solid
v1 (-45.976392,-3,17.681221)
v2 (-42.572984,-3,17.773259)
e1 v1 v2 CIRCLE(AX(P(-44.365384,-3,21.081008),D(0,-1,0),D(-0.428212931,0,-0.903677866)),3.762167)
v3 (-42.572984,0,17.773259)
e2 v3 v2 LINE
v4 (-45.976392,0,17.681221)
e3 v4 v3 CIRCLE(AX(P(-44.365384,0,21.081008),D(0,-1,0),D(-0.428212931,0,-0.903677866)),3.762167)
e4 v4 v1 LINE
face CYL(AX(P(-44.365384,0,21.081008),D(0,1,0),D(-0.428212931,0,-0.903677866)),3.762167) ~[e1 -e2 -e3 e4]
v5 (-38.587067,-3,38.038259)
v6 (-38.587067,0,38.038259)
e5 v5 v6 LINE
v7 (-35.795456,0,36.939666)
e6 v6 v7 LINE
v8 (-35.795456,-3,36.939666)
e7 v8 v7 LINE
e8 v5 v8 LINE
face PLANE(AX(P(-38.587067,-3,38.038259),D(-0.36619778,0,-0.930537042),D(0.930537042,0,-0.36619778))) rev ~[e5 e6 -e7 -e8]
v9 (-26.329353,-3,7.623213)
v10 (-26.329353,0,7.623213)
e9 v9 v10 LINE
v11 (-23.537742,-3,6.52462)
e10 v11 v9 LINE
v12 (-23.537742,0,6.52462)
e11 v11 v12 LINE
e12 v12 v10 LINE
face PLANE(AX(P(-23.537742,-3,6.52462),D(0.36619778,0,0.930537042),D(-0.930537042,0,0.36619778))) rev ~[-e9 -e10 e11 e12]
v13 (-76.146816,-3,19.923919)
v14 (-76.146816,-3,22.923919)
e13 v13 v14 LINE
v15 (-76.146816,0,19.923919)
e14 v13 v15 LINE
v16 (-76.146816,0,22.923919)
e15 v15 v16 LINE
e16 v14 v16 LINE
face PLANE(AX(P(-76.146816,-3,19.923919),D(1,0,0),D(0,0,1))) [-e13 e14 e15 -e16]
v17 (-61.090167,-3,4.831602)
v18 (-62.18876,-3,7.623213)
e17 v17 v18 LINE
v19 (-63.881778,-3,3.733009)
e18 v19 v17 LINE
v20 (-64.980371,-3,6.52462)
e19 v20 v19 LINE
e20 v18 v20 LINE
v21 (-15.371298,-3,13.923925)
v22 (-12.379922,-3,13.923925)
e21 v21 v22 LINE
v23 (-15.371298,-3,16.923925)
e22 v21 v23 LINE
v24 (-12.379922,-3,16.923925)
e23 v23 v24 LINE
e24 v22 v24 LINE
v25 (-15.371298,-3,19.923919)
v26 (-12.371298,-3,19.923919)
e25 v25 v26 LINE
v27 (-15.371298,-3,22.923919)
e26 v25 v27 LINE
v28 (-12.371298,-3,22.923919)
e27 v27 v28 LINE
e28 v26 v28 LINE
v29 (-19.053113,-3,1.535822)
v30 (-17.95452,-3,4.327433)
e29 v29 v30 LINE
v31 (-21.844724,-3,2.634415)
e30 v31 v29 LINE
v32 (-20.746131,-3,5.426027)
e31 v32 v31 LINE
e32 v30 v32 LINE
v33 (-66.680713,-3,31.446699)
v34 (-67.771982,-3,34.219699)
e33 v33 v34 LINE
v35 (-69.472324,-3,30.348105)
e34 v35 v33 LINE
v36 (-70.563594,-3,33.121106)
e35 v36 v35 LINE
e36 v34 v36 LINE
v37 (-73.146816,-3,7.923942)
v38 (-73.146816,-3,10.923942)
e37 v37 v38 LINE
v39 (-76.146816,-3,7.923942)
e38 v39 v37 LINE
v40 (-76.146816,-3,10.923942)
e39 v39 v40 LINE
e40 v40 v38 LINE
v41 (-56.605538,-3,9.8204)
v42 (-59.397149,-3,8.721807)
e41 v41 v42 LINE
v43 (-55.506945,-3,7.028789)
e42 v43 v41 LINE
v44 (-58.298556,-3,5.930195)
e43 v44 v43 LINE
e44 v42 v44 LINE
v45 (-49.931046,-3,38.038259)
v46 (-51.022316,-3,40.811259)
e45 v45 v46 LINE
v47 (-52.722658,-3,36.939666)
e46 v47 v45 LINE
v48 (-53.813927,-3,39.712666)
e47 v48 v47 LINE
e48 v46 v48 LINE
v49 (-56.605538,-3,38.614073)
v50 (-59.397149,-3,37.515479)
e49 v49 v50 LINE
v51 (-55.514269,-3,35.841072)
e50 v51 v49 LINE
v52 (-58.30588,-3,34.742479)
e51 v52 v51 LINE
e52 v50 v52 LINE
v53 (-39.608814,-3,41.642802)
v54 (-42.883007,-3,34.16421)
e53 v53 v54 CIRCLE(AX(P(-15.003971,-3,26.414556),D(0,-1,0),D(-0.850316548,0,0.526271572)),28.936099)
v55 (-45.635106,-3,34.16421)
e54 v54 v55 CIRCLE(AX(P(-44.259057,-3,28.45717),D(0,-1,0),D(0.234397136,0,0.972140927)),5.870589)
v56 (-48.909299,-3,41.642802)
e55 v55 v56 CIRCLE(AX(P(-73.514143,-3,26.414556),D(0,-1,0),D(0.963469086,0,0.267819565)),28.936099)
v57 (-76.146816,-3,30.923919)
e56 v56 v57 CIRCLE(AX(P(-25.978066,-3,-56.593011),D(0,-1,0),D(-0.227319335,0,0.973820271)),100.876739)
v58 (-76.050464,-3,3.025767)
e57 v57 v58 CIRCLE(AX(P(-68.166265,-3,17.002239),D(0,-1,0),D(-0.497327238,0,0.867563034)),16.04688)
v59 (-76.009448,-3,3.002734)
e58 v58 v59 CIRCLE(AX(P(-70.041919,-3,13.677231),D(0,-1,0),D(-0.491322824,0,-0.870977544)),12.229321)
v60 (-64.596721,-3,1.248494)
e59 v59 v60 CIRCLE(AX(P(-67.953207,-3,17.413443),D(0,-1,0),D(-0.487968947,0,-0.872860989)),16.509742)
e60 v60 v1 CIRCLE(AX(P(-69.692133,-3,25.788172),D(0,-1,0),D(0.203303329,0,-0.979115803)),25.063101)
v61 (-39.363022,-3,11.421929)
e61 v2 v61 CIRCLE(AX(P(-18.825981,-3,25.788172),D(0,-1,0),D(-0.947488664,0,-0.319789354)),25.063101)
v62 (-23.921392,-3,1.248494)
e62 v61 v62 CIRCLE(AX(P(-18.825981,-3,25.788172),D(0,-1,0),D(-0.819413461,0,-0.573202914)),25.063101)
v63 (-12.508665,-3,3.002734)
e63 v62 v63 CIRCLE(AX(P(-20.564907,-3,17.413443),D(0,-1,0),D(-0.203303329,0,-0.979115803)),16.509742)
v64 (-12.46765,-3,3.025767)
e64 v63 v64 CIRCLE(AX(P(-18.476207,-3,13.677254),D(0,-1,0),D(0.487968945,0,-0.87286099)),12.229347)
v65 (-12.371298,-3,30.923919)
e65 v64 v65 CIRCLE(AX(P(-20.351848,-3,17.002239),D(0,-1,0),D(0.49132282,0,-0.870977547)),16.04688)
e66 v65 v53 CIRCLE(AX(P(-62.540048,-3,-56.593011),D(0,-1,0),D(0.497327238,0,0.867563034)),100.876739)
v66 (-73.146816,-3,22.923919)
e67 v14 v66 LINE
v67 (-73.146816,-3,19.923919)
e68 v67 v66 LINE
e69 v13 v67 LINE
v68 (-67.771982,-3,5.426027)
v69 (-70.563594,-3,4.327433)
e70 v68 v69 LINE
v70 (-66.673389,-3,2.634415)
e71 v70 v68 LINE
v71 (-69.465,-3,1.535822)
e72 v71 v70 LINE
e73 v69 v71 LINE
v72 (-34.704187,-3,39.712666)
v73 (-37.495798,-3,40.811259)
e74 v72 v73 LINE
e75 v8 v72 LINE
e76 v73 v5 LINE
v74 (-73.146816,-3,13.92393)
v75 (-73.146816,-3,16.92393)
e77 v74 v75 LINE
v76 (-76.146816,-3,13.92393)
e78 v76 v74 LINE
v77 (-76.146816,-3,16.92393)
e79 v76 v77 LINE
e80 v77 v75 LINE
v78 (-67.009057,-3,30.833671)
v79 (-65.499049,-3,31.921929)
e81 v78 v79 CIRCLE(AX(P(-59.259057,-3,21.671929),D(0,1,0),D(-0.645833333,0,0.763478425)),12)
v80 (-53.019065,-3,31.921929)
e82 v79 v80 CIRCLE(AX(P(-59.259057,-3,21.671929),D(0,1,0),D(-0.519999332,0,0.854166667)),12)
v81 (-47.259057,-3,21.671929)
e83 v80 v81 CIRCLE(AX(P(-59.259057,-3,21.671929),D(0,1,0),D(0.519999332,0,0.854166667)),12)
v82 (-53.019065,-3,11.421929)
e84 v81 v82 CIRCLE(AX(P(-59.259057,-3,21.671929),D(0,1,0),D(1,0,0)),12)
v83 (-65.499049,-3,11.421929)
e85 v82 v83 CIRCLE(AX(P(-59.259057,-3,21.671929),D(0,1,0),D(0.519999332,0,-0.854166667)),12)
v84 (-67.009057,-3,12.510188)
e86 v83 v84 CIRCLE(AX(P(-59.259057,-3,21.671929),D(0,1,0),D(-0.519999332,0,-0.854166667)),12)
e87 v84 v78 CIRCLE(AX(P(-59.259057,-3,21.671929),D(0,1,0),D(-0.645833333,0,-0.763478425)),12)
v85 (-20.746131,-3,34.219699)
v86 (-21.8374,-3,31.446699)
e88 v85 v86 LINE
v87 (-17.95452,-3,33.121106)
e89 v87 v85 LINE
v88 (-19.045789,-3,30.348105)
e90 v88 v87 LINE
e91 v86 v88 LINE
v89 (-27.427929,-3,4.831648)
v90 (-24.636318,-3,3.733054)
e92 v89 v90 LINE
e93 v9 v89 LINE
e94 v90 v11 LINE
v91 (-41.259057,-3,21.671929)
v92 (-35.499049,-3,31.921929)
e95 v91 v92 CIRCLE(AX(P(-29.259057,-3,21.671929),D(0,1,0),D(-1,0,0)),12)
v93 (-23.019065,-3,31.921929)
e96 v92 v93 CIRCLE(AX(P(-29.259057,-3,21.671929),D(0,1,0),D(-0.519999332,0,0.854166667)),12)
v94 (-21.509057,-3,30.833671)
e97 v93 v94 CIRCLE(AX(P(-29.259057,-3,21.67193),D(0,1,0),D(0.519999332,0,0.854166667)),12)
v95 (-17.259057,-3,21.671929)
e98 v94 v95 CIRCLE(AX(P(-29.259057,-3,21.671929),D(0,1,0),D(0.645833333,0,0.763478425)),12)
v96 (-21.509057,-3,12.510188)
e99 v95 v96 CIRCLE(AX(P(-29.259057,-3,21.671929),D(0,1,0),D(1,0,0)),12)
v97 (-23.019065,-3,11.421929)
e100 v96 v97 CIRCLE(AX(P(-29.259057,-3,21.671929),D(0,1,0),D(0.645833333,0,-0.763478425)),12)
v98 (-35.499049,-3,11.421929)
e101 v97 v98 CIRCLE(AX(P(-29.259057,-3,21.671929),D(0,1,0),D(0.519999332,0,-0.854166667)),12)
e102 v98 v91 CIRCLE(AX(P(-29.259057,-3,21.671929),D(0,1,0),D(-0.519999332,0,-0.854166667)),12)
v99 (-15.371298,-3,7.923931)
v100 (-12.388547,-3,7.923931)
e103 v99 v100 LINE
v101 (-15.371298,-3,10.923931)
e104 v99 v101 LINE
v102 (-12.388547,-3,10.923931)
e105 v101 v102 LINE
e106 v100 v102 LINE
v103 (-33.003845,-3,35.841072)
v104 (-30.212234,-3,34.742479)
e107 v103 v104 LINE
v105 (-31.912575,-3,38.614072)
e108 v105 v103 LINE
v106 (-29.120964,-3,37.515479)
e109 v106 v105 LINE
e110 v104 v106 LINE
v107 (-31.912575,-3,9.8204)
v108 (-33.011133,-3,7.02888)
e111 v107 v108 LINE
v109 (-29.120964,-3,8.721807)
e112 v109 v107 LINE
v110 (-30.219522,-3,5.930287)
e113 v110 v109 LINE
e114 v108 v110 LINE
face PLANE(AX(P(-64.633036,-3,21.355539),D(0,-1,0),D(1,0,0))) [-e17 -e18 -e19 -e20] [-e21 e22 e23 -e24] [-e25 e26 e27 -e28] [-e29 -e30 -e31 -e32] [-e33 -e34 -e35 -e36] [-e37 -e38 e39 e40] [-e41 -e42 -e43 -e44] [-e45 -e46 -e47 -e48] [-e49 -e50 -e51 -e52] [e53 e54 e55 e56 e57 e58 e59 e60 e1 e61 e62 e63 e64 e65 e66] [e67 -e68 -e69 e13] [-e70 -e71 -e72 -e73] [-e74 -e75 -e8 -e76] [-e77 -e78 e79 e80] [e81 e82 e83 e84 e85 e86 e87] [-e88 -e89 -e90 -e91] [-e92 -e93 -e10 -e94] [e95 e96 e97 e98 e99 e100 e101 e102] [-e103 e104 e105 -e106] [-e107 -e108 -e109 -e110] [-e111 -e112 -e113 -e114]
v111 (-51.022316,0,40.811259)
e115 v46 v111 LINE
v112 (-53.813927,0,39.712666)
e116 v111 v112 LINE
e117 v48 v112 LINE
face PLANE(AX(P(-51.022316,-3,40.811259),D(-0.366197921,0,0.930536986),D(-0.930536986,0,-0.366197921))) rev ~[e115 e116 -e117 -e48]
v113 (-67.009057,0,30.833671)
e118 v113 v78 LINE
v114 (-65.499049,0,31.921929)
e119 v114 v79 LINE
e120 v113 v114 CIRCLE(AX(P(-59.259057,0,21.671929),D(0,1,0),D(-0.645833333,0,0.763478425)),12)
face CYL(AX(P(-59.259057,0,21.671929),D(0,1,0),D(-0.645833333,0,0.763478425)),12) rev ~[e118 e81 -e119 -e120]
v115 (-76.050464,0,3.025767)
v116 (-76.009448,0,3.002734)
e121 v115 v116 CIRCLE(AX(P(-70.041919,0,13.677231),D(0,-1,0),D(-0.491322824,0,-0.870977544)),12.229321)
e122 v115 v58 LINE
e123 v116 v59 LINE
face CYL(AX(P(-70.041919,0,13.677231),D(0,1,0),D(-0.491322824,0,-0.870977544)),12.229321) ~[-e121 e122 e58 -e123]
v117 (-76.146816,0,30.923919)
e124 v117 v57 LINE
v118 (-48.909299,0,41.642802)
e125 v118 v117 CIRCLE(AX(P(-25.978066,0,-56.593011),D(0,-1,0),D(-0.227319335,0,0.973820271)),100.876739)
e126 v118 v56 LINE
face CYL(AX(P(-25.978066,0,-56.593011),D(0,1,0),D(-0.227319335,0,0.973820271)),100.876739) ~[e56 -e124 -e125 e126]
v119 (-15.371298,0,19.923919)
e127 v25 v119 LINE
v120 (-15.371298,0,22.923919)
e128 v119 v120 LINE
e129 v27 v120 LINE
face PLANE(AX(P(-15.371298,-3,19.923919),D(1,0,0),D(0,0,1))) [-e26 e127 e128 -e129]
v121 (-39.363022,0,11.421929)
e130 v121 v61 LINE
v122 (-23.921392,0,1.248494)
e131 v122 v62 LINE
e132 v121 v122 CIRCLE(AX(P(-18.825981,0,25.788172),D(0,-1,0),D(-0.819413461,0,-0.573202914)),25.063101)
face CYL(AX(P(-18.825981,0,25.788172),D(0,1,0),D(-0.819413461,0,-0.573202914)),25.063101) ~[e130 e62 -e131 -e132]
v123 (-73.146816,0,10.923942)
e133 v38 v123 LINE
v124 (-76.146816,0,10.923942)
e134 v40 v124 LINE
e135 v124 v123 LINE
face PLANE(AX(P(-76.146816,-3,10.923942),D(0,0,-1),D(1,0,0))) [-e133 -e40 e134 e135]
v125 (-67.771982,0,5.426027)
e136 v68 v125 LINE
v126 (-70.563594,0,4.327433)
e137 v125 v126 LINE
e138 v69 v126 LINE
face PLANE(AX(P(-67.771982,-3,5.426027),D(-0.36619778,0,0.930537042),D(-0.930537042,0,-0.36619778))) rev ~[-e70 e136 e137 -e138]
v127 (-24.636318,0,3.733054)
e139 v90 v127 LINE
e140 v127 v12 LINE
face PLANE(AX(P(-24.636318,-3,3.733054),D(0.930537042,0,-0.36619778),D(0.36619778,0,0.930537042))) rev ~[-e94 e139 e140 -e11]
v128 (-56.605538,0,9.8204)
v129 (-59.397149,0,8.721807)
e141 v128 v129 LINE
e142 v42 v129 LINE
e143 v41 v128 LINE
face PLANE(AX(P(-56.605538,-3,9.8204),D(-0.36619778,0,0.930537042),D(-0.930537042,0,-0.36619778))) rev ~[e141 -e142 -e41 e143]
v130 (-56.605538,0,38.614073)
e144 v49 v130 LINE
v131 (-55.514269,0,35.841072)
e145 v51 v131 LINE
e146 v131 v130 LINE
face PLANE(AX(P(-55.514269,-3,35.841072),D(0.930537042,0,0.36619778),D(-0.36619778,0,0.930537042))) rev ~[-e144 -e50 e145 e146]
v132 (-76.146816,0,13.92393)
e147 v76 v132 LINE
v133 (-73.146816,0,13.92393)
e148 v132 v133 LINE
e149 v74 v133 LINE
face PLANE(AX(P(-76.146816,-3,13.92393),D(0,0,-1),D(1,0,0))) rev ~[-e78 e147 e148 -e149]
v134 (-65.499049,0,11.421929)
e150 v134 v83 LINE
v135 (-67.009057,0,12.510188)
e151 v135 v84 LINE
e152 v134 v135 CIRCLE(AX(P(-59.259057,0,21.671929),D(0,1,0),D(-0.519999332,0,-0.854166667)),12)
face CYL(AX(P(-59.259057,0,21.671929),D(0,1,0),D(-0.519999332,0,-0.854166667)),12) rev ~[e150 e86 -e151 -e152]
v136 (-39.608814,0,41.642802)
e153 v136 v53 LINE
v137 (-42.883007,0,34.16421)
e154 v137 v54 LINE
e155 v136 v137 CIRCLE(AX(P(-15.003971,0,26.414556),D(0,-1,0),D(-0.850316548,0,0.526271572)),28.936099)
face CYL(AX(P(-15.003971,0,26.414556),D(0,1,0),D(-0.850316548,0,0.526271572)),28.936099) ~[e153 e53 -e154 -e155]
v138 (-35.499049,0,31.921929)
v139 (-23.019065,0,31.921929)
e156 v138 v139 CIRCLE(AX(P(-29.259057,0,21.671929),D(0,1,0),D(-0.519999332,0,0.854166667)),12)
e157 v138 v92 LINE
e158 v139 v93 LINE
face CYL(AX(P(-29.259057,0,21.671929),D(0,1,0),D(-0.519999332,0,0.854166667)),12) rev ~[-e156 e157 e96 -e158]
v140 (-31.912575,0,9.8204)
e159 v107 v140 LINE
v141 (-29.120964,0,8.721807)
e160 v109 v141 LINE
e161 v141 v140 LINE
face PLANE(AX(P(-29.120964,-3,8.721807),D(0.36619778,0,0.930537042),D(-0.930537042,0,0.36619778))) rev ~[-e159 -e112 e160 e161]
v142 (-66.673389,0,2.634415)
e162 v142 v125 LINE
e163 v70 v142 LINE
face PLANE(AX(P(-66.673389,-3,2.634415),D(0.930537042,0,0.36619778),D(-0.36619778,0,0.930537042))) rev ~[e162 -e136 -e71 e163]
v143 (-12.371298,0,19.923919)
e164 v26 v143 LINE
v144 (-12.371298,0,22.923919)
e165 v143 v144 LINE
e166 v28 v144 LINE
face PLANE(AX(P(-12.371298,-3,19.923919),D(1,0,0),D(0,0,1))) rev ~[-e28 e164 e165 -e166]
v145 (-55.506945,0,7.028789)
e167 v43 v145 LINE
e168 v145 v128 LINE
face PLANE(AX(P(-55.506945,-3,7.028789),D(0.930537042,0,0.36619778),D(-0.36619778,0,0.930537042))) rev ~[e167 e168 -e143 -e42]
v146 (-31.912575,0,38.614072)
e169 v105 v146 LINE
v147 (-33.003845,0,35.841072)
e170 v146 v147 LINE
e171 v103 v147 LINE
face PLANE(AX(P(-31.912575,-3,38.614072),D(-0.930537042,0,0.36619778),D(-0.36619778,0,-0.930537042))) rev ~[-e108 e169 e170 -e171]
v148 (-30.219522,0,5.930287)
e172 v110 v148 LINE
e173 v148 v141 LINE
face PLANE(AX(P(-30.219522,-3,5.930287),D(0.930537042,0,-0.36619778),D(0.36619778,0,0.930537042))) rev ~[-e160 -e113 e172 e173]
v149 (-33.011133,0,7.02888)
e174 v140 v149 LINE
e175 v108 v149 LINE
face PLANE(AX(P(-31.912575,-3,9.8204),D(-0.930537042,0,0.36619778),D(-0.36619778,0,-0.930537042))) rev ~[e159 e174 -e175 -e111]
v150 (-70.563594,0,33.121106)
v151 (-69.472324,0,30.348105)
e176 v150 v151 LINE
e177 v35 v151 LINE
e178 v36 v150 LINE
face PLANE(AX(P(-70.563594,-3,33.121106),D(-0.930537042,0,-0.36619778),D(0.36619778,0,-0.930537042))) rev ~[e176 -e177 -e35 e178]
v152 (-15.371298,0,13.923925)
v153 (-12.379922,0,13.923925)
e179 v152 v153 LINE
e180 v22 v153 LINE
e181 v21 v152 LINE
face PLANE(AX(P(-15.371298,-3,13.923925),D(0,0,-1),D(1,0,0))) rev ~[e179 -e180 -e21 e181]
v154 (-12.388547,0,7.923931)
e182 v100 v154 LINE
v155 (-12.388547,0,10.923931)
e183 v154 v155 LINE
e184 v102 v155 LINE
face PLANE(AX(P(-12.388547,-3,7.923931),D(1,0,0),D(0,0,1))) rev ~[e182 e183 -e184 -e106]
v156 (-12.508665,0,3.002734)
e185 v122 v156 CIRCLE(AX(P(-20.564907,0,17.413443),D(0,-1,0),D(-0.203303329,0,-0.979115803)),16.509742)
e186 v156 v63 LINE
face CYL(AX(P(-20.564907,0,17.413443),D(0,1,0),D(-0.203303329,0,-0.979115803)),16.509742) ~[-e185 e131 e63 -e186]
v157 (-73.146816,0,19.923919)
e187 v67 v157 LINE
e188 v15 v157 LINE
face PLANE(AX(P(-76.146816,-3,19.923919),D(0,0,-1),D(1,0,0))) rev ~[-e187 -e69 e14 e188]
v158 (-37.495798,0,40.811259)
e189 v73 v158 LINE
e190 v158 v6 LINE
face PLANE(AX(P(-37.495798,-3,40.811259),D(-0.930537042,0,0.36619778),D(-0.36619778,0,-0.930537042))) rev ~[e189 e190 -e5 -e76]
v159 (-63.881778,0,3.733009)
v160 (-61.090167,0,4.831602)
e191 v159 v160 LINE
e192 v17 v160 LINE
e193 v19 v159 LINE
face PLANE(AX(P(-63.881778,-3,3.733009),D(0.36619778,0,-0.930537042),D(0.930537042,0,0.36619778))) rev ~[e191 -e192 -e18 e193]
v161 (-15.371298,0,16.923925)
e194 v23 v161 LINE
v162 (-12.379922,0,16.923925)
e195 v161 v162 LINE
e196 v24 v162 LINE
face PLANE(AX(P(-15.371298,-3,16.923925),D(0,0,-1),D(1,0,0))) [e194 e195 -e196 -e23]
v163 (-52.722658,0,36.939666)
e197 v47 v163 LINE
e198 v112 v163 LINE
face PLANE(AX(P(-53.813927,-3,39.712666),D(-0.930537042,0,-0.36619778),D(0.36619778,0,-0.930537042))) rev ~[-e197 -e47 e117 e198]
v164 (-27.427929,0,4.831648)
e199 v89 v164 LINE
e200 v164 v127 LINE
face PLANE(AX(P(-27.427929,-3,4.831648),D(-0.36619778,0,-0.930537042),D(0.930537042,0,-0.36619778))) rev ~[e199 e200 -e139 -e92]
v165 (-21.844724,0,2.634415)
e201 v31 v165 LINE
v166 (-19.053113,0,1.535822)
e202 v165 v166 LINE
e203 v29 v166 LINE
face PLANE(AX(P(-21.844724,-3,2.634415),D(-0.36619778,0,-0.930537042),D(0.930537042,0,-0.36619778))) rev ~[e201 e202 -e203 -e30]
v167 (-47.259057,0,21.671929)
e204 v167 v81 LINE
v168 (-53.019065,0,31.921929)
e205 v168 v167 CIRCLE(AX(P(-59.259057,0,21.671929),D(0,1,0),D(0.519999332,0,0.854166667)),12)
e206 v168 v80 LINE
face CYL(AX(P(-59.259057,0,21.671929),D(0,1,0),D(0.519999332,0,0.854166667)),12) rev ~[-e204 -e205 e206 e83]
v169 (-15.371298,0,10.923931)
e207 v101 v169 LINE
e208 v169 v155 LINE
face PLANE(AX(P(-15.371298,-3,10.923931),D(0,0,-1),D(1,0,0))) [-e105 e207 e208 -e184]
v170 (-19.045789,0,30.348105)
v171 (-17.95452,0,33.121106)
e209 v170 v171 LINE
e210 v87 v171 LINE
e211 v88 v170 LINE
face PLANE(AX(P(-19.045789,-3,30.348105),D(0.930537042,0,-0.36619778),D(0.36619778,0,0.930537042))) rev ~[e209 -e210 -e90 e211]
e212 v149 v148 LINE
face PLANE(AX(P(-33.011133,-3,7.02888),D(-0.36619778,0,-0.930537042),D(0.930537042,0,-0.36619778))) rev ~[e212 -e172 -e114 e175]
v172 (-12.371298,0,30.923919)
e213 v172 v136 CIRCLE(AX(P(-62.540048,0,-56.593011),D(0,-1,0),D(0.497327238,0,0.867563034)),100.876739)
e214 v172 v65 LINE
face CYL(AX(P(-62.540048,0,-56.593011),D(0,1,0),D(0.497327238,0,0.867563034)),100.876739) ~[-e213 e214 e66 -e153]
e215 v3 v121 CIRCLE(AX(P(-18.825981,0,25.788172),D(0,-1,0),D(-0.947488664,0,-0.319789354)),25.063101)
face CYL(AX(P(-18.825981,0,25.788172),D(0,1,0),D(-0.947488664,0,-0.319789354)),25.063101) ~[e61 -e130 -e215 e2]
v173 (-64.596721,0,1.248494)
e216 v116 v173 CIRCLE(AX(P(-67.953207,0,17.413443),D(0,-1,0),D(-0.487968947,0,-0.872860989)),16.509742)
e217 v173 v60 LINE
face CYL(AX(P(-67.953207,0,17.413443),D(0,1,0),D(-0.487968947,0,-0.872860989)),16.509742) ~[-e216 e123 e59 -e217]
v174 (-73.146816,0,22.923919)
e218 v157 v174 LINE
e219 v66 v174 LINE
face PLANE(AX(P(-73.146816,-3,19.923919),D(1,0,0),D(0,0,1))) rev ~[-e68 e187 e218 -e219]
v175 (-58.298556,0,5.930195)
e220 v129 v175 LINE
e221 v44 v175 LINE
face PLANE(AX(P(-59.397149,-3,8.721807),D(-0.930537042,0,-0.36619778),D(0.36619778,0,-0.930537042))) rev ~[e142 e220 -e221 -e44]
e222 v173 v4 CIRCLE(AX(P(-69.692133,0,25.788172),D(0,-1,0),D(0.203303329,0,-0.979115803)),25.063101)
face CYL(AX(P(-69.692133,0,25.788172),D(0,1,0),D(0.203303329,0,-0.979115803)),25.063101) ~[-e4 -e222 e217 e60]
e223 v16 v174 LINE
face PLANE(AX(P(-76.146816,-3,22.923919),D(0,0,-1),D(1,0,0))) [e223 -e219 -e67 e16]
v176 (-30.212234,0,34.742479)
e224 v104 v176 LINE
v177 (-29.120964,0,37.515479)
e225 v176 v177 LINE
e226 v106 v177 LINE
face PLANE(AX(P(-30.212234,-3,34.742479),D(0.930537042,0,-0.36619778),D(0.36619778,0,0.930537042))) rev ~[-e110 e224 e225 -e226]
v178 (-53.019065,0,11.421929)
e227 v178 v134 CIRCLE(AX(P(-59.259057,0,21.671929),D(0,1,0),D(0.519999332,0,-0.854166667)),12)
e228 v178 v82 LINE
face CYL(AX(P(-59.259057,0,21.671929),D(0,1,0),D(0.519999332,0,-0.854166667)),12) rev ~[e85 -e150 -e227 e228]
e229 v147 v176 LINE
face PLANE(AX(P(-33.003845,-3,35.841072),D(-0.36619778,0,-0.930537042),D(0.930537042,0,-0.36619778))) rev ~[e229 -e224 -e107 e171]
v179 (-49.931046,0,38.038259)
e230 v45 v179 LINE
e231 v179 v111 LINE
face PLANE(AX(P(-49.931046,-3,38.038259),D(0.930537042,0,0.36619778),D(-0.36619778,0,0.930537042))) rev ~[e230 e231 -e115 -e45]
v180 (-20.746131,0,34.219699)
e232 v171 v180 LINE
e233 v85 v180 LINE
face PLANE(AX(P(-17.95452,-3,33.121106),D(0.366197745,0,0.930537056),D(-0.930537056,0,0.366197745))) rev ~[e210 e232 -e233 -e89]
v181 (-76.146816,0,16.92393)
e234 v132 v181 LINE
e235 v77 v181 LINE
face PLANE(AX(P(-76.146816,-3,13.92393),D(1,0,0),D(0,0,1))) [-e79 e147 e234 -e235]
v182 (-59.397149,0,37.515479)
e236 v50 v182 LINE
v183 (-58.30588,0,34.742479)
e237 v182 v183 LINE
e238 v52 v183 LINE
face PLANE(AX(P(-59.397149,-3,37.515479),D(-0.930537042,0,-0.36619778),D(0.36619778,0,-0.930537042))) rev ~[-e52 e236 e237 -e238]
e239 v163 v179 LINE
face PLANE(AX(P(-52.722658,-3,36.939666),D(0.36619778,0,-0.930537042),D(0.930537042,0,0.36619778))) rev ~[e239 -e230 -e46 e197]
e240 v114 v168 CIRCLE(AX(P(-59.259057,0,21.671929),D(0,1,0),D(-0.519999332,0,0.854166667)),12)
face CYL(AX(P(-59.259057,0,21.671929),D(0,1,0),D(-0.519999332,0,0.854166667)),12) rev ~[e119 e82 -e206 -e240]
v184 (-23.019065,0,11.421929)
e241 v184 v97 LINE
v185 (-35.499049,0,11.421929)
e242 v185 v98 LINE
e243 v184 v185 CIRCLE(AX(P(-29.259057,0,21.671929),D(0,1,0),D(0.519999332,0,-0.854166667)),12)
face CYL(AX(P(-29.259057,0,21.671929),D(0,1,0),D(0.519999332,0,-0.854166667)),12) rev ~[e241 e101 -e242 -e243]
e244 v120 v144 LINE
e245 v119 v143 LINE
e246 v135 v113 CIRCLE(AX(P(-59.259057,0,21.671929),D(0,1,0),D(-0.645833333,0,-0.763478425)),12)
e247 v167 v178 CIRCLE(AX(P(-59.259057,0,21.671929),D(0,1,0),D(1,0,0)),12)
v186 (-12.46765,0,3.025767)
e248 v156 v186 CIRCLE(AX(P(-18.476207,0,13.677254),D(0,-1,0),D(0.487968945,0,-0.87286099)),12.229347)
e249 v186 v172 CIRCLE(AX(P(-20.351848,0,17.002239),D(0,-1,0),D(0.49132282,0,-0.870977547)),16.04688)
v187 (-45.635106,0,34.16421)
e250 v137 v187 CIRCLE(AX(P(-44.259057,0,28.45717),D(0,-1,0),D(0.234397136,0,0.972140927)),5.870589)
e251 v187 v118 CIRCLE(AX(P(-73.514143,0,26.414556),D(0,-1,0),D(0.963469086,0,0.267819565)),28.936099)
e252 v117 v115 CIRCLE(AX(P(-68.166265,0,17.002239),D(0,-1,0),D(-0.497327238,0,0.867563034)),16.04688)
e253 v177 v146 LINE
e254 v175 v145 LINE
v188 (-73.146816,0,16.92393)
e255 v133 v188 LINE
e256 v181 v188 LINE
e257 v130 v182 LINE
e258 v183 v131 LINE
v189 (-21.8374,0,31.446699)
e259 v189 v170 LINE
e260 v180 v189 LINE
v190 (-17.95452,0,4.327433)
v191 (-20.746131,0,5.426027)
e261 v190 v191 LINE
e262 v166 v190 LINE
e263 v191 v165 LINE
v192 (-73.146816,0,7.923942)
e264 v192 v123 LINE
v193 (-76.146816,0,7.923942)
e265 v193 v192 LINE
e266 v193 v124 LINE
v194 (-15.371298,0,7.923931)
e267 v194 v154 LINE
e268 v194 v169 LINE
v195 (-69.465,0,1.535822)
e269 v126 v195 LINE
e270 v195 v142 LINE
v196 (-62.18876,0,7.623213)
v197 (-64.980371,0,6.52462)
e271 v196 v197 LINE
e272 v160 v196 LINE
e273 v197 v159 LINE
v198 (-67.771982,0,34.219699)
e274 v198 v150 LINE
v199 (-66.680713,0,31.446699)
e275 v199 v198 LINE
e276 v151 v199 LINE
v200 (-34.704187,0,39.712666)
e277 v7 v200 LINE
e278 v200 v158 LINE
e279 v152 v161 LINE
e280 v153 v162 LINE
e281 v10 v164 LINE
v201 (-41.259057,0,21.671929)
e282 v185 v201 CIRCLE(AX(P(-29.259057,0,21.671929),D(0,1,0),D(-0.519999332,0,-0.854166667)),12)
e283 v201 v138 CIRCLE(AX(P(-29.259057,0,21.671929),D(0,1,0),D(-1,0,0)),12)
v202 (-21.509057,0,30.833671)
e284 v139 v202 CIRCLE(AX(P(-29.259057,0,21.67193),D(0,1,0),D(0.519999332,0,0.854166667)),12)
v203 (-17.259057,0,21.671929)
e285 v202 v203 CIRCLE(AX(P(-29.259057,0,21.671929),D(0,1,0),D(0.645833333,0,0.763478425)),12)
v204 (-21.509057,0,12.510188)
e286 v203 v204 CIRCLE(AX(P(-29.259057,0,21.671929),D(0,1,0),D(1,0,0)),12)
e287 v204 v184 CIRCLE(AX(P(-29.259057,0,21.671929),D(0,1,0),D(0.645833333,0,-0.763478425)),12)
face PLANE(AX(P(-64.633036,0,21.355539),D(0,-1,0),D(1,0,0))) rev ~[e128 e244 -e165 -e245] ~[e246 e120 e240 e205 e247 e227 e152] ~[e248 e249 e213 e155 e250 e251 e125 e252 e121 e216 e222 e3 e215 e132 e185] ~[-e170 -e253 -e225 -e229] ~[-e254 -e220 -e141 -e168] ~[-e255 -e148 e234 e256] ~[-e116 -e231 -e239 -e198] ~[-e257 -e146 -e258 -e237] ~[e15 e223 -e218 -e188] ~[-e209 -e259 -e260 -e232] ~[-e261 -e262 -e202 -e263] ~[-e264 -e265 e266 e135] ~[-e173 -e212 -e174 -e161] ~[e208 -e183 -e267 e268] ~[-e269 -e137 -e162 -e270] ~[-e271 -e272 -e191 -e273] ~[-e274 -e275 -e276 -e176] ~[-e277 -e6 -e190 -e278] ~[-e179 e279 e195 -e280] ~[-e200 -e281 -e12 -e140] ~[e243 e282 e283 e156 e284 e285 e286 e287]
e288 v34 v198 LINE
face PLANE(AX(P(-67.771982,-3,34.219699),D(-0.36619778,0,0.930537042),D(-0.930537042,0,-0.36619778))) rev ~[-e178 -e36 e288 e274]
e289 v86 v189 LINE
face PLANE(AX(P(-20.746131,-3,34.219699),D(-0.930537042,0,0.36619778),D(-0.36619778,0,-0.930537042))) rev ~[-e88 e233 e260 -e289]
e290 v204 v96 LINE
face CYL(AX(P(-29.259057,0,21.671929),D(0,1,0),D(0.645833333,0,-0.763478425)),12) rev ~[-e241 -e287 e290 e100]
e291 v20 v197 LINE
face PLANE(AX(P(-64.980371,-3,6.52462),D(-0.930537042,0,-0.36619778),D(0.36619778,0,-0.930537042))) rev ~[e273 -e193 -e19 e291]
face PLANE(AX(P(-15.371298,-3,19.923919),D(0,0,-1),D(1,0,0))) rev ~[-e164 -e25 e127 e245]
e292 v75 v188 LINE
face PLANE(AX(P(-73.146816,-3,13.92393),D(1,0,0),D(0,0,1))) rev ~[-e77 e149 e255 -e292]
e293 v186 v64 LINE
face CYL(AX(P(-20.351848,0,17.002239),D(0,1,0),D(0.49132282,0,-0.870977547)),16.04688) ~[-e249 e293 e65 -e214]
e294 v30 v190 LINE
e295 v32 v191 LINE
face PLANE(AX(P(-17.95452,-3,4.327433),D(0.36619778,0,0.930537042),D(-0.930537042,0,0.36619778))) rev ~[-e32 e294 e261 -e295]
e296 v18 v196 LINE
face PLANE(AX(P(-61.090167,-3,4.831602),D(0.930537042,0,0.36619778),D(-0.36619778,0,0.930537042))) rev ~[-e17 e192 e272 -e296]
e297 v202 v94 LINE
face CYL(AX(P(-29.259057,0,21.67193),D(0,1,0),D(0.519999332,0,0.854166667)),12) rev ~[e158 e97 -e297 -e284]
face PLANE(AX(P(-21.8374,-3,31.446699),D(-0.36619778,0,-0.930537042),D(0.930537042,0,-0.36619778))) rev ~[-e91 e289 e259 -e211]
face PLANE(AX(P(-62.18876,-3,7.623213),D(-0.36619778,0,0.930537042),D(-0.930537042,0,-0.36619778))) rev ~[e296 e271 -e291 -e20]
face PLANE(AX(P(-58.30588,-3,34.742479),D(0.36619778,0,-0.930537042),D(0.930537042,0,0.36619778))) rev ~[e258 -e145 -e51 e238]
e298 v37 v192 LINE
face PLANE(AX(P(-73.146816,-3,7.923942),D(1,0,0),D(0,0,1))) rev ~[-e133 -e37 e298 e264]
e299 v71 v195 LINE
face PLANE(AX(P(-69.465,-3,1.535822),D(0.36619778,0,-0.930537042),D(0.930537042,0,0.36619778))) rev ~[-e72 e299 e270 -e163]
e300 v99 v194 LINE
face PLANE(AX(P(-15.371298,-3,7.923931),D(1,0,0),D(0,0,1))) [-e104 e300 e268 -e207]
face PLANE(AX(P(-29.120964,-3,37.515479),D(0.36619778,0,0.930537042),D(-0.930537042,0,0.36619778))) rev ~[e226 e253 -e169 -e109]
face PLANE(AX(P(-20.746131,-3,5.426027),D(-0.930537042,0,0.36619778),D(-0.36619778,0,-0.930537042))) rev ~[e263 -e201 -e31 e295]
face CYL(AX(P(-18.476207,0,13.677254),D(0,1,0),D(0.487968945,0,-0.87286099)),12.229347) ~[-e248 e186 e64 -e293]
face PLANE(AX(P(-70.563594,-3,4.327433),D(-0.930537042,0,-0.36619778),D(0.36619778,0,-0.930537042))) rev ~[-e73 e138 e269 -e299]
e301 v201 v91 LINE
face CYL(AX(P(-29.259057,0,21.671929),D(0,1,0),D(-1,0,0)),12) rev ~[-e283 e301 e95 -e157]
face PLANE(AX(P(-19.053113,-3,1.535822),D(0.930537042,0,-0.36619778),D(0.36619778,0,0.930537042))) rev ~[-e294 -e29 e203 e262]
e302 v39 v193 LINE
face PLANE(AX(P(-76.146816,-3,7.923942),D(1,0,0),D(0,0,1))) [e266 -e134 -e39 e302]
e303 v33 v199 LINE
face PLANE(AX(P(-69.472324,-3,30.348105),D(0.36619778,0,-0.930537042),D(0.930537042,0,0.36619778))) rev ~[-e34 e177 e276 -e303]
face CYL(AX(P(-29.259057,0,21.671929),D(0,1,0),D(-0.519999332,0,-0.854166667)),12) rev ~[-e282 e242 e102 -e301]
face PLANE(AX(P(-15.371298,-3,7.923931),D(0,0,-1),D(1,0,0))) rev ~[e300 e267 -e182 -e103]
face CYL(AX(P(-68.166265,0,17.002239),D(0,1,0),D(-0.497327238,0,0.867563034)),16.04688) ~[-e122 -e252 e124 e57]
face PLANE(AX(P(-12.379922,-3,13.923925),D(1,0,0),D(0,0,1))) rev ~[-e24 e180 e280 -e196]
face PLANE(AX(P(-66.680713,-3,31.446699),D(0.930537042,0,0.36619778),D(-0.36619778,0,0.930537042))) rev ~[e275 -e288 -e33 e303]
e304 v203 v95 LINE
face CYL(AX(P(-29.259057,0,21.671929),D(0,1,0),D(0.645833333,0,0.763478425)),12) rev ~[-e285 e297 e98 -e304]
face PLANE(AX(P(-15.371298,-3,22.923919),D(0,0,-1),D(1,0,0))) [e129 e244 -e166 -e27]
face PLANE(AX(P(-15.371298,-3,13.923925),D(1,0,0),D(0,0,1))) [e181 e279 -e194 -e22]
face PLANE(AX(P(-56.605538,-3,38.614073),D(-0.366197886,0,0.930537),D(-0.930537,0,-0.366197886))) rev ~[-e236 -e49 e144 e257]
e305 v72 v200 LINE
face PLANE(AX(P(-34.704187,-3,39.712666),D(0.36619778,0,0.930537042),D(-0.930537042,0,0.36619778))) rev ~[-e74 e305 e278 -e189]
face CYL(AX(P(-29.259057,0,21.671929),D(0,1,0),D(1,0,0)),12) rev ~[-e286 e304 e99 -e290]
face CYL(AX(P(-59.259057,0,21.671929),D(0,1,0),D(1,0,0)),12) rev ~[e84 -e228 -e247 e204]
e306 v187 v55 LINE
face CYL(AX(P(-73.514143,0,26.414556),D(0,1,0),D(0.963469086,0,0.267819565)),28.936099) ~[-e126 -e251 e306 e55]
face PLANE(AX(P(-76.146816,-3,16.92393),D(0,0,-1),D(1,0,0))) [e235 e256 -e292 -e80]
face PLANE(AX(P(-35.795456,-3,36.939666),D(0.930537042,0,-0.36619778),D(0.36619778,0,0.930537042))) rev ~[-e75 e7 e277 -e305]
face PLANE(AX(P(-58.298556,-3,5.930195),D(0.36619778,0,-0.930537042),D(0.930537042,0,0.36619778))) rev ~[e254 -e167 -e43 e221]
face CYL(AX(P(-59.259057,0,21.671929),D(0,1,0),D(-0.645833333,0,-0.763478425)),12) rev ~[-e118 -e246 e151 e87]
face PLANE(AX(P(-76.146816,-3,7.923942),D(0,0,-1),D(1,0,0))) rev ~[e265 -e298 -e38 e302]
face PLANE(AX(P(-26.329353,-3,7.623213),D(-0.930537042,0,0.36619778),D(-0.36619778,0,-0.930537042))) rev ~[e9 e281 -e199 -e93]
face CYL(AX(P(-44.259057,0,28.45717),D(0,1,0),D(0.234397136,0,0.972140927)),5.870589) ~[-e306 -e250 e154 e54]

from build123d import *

# Parameters (mm, degrees)
F1_DEPTH = 3
F2_W     = 2.9827502628
F2_H     = 3
F2_W_2   = 2.9913751314
F2_W_3   = 3
F3_DEPTH = 25


# Not quite as in the source:
# - ends of sketch curves that miss each other by under 0.0002 mm in the source are joined


with BuildPart() as f1:
    # F0 (on Front) → F1 (new body)
    with BuildSketch(Plane.XZ):
        with BuildLine():
            ThreePointArc((-65.4990487043, 31.9219294953), (-59.2590567172, 33.6719294953), (-53.01906473, 31.9219294953))
            Line((-53.01906473, 31.9219294953), (-45.1069841329, 31.9219294953))
            ThreePointArc((-45.1069841329, 31.9219294953), (-45.3487223927, 33.0483271736), (-45.635105941, 34.1642095953))
            ThreePointArc((-45.635105941, 34.1642095953), (-47.0071291889, 38.0195574022), (-48.9092989792, 41.6428024387))
            ThreePointArc((-48.9092989792, 41.6428024387), (-62.9189036621, 37.276531414), (-76.1468158191, 30.9239188806))
            ThreePointArc((-76.1468158191, 30.9239188806), (-84.213049611, 16.9468180053), (-76.0504636415, 3.0257667966))
            ThreePointArc((-76.0504636415, 3.0257667966), (-76.029966864, 3.0142304296), (-76.0094479368, 3.0027335048))
            ThreePointArc((-76.0094479368, 3.0027335048), (-70.4614460946, 1.0953454703), (-64.596721114, 1.2484939552))
            ThreePointArc((-64.596721114, 1.2484939552), (-55.9033559949, 4.8590380101), (-49.1550909719, 11.4219294953))
            Line((-49.1550909719, 11.4219294953), (-53.01906473, 11.4219294953))
            ThreePointArc((-53.01906473, 11.4219294953), (-59.2590567172, 9.6719294953), (-65.4990487043, 11.4219294953))
            Line((-65.4990487043, 11.4219294953), (-67.0090567172, 11.4219294953))
            Line((-67.0090567172, 11.4219294953), (-67.0090567172, 12.5101883944))
            ThreePointArc((-67.0090567172, 12.5101883944), (-71.2590567172, 21.6719294953), (-67.0090567172, 30.8336705962))
            Line((-67.0090567172, 30.8336705962), (-67.0090567172, 31.9219294953))
            Line((-67.0090567172, 31.9219294953), (-65.4990487043, 31.9219294953))
        make_face()
        with BuildLine():
            ThreePointArc((-42.8830074933, 34.1642095953), (-43.1693910416, 33.0483271736), (-43.4111293014, 31.9219294953))
            Line((-43.4111293014, 31.9219294953), (-35.4990487043, 31.9219294953))
            ThreePointArc((-35.4990487043, 31.9219294953), (-29.2590567172, 33.6719294953), (-23.01906473, 31.9219294953))
            Line((-23.01906473, 31.9219294953), (-21.5090567172, 31.9219294953))
            Line((-21.5090567172, 31.9219294953), (-21.5090567172, 30.8336705962))
            ThreePointArc((-21.5090567172, 30.8336705962), (-18.3732861886, 26.7216819645), (-17.2590567172, 21.6719294953))
            ThreePointArc((-17.2590567172, 21.6719294953), (-18.3732861886, 16.6221770261), (-21.5090567172, 12.5101883944))
            Line((-21.5090567172, 12.5101883944), (-21.5090567172, 11.4219294953))
            Line((-21.5090567172, 11.4219294953), (-23.01906473, 11.4219294953))
            ThreePointArc((-23.01906473, 11.4219294953), (-29.2590567172, 9.6719294953), (-35.4990487043, 11.4219294953))
            Line((-35.4990487043, 11.4219294953), (-39.3630224624, 11.4219294953))
            ThreePointArc((-39.3630224624, 11.4219294953), (-32.6147574394, 4.8590380101), (-23.9213923203, 1.2484939552))
            ThreePointArc((-23.9213923203, 1.2484939552), (-18.0566673397, 1.0953454703), (-12.5086654975, 3.0027335048))
            ThreePointArc((-12.5086654975, 3.0027335048), (-12.4881465704, 3.0142304296), (-12.4676497928, 3.0257667966))
            ThreePointArc((-12.4676497928, 3.0257667966), (-4.3050638233, 16.9468180053), (-12.3712976152, 30.9239188806))
            ThreePointArc((-12.3712976152, 30.9239188806), (-25.5992097722, 37.276531414), (-39.6088144552, 41.6428024387))
            ThreePointArc((-39.6088144552, 41.6428024387), (-41.5109842454, 38.0195574022), (-42.8830074933, 34.1642095953))
        make_face()
        with BuildLine():
            Line((-43.5487545967, 21.6719294953), (-44.9693588376, 21.6719294953))
            ThreePointArc((-44.9693588376, 21.6719294953), (-45.3908188129, 19.6558686516), (-45.9763922185, 17.6812209304))
            ThreePointArc((-45.9763922185, 17.6812209304), (-44.2636810752, 17.3202159397), (-42.5729841678, 17.7732590184))
            ThreePointArc((-42.5729841678, 17.7732590184), (-43.1391404553, 19.7030043482), (-43.5487545967, 21.6719294953))
        make_face()
        with BuildLine():
            ThreePointArc((-43.559121813, 21.7346880473), (-43.5539581146, 21.7033054824), (-43.5487545967, 21.6719294953))
            Line((-43.5487545967, 21.6719294953), (-41.2590567172, 21.6719294953))
            ThreePointArc((-41.2590567172, 21.6719294953), (-39.7204118838, 27.550708967), (-35.4990487043, 31.9219294953))
            Line((-35.4990487043, 31.9219294953), (-43.4111293014, 31.9219294953))
            ThreePointArc((-43.4111293014, 31.9219294953), (-43.9370167563, 26.8348735037), (-43.559121813, 21.7346880473))
        make_face()
        with BuildLine():
            ThreePointArc((-53.01906473, 31.9219294953), (-48.7977015505, 27.550708967), (-47.2590567172, 21.6719294953))
            Line((-47.2590567172, 21.6719294953), (-44.9693588376, 21.6719294953))
            ThreePointArc((-44.9693588376, 21.6719294953), (-44.9641553197, 21.7033054824), (-44.9589916213, 21.7346880473))
            ThreePointArc((-44.9589916213, 21.7346880473), (-44.581096678, 26.8348735037), (-45.1069841329, 31.9219294953))
            Line((-45.1069841329, 31.9219294953), (-53.01906473, 31.9219294953))
        make_face()
        with BuildLine():
            Line((-44.9693588376, 21.6719294953), (-47.2590567172, 21.6719294953))
            ThreePointArc((-47.2590567172, 21.6719294953), (-48.7977015505, 15.7931500236), (-53.01906473, 11.4219294953))
            Line((-53.01906473, 11.4219294953), (-49.1550909719, 11.4219294953))
            ThreePointArc((-49.1550909719, 11.4219294953), (-47.3455028522, 14.4397298666), (-45.9763922185, 17.6812209304))
            ThreePointArc((-45.9763922185, 17.6812209304), (-45.3908188129, 19.6558686516), (-44.9693588376, 21.6719294953))
        make_face()
        with BuildLine():
            Line((-41.2590567172, 21.6719294953), (-43.5487545967, 21.6719294953))
            ThreePointArc((-43.5487545967, 21.6719294953), (-43.1391404553, 19.7030043482), (-42.5729841678, 17.7732590184))
            ThreePointArc((-42.5729841678, 17.7732590184), (-41.1945750254, 14.4830849229), (-39.3630224624, 11.4219294953))
            Line((-39.3630224624, 11.4219294953), (-35.4990487043, 11.4219294953))
            ThreePointArc((-35.4990487043, 11.4219294953), (-39.7204118838, 15.7931500236), (-41.2590567172, 21.6719294953))
        make_face()
        with BuildLine():
            ThreePointArc((-44.9589916213, 21.7346880473), (-44.9641553197, 21.7033054824), (-44.9693588376, 21.6719294953))
            Line((-44.9693588376, 21.6719294953), (-43.5487545967, 21.6719294953))
            ThreePointArc((-43.5487545967, 21.6719294953), (-43.5539581146, 21.7033054824), (-43.559121813, 21.7346880473))
            ThreePointArc((-43.559121813, 21.7346880473), (-43.9370167563, 26.8348735037), (-43.4111293014, 31.9219294953))
            Line((-43.4111293014, 31.9219294953), (-45.1069841329, 31.9219294953))
            ThreePointArc((-45.1069841329, 31.9219294953), (-44.581096678, 26.8348735037), (-44.9589916213, 21.7346880473))
        make_face()
        with BuildLine():
            ThreePointArc((-45.635105941, 34.1642095953), (-45.3487223927, 33.0483271736), (-45.1069841329, 31.9219294953))
            Line((-45.1069841329, 31.9219294953), (-43.4111293014, 31.9219294953))
            ThreePointArc((-43.4111293014, 31.9219294953), (-43.1693910416, 33.0483271736), (-42.8830074933, 34.1642095953))
            ThreePointArc((-42.8830074933, 34.1642095953), (-44.2590567172, 34.327758758), (-45.635105941, 34.1642095953))
        make_face()
        with BuildLine():
            Line((-67.0090567172, 11.4219294953), (-65.4990487043, 11.4219294953))
            ThreePointArc((-65.4990487043, 11.4219294953), (-66.2751842679, 11.9367379619), (-67.0090567172, 12.5101883944))
            Line((-67.0090567172, 12.5101883944), (-67.0090567172, 11.4219294953))
        make_face()
        with BuildLine():
            ThreePointArc((-21.5090567172, 12.5101883944), (-22.2429291664, 11.9367379619), (-23.01906473, 11.4219294953))
            Line((-23.01906473, 11.4219294953), (-21.5090567172, 11.4219294953))
            Line((-21.5090567172, 11.4219294953), (-21.5090567172, 12.5101883944))
        make_face()
        with BuildLine():
            Line((-21.5090567172, 31.9219294953), (-23.01906473, 31.9219294953))
            ThreePointArc((-23.01906473, 31.9219294953), (-22.2429291664, 31.4071210287), (-21.5090567172, 30.8336705962))
            Line((-21.5090567172, 30.8336705962), (-21.5090567172, 31.9219294953))
        make_face()
        with BuildLine():
            ThreePointArc((-67.0090567172, 30.8336705962), (-66.2751842679, 31.4071210287), (-65.4990487043, 31.9219294953))
            Line((-65.4990487043, 31.9219294953), (-67.0090567172, 31.9219294953))
            Line((-67.0090567172, 31.9219294953), (-67.0090567172, 30.8336705962))
        make_face()
    extrude(amount=F1_DEPTH)

    # F2 (on face) → F3 (cut)
    with BuildSketch(Plane.XZ.offset(3)):
        Polygon((-67.7719824437, 5.4260265126), (-70.5635935688, 4.3274331729), (-69.4650002292, 1.5358220478), (-66.673389104, 2.6344153875), align=None)
        Polygon((-29.1209643657, 8.7218065315), (-31.9125754908, 9.8203998712), (-33.0111329333, 7.0288799637), (-30.2195218081, 5.930286624), align=None)
        Polygon((-23.5377421156, 6.5246198522), (-26.3293532407, 7.6232131919), (-27.4279286318, 4.8316476756), (-24.6363175066, 3.7330543359), align=None)
        Polygon((-19.0531132051, 1.5358220478), (-17.9545198655, 4.3274331729), (-20.7461309906, 5.4260265126), (-21.8447243303, 2.6344153875), align=None)
        with Locations((-13.8799224838, 9.4239312787)):
            Rectangle(F2_W, F2_H)
        with Locations((-13.8756100495, 15.4239250796)):
            Rectangle(F2_W_2, F2_H)
        with Locations((-13.8712976152, 21.4239188806)):
            Rectangle(F2_W_3, F2_H)
        Polygon((-19.0457892079, 30.3481052815), (-17.9545198238, 33.1211056658), (-20.7461309906, 34.2196988996), (-21.837400333, 31.4466986212), align=None)
        Polygon((-29.120964366, 37.5154789187), (-31.9125754912, 38.6140722584), (-33.0038447503, 35.8410721917), (-30.2122336251, 34.742478852), align=None)
        Polygon((-34.7041866163, 39.712665598), (-37.4957977415, 40.8112589377), (-38.5870669589, 38.0382589769), (-35.7954558337, 36.9396656372), align=None)
        Polygon((-67.7719824437, 34.2196988996), (-70.5635935688, 33.12110556), (-69.4723242264, 30.3481052815), (-66.6807131013, 31.4466986212), align=None)
        Polygon((-55.5142686841, 35.8410721917), (-56.6055380681, 38.614072576), (-59.3971490683, 37.5154789187), (-58.3058798092, 34.742478852), align=None)
        Polygon((-49.9310464754, 38.0382589769), (-51.0223158595, 40.8112593612), (-53.813926818, 39.712665598), (-52.7226576006, 36.9396656372), align=None)
        with Locations((-74.6468158191, 21.4239188806)):
            Rectangle(F2_W_3, F2_H)
        with Locations((-74.6468158191, 9.4239419771)):
            Rectangle(F2_W_3, F2_H)
        Polygon((-61.0901668537, 4.8316020668), (-62.1887601934, 7.623213192), (-64.9803713186, 6.5246198523), (-63.8817779789, 3.7330087272), align=None)
        Polygon((-55.5069446035, 7.0287887462), (-56.6055379431, 9.8203998713), (-59.3971490683, 8.7218065317), (-58.2985557286, 5.9301954065), align=None)
        with Locations((-74.6468158191, 15.4239304289)):
            Rectangle(F2_W_3, F2_H)
    extrude(amount=-F3_DEPTH, mode=Mode.SUBTRACT)


solid = f1.part
